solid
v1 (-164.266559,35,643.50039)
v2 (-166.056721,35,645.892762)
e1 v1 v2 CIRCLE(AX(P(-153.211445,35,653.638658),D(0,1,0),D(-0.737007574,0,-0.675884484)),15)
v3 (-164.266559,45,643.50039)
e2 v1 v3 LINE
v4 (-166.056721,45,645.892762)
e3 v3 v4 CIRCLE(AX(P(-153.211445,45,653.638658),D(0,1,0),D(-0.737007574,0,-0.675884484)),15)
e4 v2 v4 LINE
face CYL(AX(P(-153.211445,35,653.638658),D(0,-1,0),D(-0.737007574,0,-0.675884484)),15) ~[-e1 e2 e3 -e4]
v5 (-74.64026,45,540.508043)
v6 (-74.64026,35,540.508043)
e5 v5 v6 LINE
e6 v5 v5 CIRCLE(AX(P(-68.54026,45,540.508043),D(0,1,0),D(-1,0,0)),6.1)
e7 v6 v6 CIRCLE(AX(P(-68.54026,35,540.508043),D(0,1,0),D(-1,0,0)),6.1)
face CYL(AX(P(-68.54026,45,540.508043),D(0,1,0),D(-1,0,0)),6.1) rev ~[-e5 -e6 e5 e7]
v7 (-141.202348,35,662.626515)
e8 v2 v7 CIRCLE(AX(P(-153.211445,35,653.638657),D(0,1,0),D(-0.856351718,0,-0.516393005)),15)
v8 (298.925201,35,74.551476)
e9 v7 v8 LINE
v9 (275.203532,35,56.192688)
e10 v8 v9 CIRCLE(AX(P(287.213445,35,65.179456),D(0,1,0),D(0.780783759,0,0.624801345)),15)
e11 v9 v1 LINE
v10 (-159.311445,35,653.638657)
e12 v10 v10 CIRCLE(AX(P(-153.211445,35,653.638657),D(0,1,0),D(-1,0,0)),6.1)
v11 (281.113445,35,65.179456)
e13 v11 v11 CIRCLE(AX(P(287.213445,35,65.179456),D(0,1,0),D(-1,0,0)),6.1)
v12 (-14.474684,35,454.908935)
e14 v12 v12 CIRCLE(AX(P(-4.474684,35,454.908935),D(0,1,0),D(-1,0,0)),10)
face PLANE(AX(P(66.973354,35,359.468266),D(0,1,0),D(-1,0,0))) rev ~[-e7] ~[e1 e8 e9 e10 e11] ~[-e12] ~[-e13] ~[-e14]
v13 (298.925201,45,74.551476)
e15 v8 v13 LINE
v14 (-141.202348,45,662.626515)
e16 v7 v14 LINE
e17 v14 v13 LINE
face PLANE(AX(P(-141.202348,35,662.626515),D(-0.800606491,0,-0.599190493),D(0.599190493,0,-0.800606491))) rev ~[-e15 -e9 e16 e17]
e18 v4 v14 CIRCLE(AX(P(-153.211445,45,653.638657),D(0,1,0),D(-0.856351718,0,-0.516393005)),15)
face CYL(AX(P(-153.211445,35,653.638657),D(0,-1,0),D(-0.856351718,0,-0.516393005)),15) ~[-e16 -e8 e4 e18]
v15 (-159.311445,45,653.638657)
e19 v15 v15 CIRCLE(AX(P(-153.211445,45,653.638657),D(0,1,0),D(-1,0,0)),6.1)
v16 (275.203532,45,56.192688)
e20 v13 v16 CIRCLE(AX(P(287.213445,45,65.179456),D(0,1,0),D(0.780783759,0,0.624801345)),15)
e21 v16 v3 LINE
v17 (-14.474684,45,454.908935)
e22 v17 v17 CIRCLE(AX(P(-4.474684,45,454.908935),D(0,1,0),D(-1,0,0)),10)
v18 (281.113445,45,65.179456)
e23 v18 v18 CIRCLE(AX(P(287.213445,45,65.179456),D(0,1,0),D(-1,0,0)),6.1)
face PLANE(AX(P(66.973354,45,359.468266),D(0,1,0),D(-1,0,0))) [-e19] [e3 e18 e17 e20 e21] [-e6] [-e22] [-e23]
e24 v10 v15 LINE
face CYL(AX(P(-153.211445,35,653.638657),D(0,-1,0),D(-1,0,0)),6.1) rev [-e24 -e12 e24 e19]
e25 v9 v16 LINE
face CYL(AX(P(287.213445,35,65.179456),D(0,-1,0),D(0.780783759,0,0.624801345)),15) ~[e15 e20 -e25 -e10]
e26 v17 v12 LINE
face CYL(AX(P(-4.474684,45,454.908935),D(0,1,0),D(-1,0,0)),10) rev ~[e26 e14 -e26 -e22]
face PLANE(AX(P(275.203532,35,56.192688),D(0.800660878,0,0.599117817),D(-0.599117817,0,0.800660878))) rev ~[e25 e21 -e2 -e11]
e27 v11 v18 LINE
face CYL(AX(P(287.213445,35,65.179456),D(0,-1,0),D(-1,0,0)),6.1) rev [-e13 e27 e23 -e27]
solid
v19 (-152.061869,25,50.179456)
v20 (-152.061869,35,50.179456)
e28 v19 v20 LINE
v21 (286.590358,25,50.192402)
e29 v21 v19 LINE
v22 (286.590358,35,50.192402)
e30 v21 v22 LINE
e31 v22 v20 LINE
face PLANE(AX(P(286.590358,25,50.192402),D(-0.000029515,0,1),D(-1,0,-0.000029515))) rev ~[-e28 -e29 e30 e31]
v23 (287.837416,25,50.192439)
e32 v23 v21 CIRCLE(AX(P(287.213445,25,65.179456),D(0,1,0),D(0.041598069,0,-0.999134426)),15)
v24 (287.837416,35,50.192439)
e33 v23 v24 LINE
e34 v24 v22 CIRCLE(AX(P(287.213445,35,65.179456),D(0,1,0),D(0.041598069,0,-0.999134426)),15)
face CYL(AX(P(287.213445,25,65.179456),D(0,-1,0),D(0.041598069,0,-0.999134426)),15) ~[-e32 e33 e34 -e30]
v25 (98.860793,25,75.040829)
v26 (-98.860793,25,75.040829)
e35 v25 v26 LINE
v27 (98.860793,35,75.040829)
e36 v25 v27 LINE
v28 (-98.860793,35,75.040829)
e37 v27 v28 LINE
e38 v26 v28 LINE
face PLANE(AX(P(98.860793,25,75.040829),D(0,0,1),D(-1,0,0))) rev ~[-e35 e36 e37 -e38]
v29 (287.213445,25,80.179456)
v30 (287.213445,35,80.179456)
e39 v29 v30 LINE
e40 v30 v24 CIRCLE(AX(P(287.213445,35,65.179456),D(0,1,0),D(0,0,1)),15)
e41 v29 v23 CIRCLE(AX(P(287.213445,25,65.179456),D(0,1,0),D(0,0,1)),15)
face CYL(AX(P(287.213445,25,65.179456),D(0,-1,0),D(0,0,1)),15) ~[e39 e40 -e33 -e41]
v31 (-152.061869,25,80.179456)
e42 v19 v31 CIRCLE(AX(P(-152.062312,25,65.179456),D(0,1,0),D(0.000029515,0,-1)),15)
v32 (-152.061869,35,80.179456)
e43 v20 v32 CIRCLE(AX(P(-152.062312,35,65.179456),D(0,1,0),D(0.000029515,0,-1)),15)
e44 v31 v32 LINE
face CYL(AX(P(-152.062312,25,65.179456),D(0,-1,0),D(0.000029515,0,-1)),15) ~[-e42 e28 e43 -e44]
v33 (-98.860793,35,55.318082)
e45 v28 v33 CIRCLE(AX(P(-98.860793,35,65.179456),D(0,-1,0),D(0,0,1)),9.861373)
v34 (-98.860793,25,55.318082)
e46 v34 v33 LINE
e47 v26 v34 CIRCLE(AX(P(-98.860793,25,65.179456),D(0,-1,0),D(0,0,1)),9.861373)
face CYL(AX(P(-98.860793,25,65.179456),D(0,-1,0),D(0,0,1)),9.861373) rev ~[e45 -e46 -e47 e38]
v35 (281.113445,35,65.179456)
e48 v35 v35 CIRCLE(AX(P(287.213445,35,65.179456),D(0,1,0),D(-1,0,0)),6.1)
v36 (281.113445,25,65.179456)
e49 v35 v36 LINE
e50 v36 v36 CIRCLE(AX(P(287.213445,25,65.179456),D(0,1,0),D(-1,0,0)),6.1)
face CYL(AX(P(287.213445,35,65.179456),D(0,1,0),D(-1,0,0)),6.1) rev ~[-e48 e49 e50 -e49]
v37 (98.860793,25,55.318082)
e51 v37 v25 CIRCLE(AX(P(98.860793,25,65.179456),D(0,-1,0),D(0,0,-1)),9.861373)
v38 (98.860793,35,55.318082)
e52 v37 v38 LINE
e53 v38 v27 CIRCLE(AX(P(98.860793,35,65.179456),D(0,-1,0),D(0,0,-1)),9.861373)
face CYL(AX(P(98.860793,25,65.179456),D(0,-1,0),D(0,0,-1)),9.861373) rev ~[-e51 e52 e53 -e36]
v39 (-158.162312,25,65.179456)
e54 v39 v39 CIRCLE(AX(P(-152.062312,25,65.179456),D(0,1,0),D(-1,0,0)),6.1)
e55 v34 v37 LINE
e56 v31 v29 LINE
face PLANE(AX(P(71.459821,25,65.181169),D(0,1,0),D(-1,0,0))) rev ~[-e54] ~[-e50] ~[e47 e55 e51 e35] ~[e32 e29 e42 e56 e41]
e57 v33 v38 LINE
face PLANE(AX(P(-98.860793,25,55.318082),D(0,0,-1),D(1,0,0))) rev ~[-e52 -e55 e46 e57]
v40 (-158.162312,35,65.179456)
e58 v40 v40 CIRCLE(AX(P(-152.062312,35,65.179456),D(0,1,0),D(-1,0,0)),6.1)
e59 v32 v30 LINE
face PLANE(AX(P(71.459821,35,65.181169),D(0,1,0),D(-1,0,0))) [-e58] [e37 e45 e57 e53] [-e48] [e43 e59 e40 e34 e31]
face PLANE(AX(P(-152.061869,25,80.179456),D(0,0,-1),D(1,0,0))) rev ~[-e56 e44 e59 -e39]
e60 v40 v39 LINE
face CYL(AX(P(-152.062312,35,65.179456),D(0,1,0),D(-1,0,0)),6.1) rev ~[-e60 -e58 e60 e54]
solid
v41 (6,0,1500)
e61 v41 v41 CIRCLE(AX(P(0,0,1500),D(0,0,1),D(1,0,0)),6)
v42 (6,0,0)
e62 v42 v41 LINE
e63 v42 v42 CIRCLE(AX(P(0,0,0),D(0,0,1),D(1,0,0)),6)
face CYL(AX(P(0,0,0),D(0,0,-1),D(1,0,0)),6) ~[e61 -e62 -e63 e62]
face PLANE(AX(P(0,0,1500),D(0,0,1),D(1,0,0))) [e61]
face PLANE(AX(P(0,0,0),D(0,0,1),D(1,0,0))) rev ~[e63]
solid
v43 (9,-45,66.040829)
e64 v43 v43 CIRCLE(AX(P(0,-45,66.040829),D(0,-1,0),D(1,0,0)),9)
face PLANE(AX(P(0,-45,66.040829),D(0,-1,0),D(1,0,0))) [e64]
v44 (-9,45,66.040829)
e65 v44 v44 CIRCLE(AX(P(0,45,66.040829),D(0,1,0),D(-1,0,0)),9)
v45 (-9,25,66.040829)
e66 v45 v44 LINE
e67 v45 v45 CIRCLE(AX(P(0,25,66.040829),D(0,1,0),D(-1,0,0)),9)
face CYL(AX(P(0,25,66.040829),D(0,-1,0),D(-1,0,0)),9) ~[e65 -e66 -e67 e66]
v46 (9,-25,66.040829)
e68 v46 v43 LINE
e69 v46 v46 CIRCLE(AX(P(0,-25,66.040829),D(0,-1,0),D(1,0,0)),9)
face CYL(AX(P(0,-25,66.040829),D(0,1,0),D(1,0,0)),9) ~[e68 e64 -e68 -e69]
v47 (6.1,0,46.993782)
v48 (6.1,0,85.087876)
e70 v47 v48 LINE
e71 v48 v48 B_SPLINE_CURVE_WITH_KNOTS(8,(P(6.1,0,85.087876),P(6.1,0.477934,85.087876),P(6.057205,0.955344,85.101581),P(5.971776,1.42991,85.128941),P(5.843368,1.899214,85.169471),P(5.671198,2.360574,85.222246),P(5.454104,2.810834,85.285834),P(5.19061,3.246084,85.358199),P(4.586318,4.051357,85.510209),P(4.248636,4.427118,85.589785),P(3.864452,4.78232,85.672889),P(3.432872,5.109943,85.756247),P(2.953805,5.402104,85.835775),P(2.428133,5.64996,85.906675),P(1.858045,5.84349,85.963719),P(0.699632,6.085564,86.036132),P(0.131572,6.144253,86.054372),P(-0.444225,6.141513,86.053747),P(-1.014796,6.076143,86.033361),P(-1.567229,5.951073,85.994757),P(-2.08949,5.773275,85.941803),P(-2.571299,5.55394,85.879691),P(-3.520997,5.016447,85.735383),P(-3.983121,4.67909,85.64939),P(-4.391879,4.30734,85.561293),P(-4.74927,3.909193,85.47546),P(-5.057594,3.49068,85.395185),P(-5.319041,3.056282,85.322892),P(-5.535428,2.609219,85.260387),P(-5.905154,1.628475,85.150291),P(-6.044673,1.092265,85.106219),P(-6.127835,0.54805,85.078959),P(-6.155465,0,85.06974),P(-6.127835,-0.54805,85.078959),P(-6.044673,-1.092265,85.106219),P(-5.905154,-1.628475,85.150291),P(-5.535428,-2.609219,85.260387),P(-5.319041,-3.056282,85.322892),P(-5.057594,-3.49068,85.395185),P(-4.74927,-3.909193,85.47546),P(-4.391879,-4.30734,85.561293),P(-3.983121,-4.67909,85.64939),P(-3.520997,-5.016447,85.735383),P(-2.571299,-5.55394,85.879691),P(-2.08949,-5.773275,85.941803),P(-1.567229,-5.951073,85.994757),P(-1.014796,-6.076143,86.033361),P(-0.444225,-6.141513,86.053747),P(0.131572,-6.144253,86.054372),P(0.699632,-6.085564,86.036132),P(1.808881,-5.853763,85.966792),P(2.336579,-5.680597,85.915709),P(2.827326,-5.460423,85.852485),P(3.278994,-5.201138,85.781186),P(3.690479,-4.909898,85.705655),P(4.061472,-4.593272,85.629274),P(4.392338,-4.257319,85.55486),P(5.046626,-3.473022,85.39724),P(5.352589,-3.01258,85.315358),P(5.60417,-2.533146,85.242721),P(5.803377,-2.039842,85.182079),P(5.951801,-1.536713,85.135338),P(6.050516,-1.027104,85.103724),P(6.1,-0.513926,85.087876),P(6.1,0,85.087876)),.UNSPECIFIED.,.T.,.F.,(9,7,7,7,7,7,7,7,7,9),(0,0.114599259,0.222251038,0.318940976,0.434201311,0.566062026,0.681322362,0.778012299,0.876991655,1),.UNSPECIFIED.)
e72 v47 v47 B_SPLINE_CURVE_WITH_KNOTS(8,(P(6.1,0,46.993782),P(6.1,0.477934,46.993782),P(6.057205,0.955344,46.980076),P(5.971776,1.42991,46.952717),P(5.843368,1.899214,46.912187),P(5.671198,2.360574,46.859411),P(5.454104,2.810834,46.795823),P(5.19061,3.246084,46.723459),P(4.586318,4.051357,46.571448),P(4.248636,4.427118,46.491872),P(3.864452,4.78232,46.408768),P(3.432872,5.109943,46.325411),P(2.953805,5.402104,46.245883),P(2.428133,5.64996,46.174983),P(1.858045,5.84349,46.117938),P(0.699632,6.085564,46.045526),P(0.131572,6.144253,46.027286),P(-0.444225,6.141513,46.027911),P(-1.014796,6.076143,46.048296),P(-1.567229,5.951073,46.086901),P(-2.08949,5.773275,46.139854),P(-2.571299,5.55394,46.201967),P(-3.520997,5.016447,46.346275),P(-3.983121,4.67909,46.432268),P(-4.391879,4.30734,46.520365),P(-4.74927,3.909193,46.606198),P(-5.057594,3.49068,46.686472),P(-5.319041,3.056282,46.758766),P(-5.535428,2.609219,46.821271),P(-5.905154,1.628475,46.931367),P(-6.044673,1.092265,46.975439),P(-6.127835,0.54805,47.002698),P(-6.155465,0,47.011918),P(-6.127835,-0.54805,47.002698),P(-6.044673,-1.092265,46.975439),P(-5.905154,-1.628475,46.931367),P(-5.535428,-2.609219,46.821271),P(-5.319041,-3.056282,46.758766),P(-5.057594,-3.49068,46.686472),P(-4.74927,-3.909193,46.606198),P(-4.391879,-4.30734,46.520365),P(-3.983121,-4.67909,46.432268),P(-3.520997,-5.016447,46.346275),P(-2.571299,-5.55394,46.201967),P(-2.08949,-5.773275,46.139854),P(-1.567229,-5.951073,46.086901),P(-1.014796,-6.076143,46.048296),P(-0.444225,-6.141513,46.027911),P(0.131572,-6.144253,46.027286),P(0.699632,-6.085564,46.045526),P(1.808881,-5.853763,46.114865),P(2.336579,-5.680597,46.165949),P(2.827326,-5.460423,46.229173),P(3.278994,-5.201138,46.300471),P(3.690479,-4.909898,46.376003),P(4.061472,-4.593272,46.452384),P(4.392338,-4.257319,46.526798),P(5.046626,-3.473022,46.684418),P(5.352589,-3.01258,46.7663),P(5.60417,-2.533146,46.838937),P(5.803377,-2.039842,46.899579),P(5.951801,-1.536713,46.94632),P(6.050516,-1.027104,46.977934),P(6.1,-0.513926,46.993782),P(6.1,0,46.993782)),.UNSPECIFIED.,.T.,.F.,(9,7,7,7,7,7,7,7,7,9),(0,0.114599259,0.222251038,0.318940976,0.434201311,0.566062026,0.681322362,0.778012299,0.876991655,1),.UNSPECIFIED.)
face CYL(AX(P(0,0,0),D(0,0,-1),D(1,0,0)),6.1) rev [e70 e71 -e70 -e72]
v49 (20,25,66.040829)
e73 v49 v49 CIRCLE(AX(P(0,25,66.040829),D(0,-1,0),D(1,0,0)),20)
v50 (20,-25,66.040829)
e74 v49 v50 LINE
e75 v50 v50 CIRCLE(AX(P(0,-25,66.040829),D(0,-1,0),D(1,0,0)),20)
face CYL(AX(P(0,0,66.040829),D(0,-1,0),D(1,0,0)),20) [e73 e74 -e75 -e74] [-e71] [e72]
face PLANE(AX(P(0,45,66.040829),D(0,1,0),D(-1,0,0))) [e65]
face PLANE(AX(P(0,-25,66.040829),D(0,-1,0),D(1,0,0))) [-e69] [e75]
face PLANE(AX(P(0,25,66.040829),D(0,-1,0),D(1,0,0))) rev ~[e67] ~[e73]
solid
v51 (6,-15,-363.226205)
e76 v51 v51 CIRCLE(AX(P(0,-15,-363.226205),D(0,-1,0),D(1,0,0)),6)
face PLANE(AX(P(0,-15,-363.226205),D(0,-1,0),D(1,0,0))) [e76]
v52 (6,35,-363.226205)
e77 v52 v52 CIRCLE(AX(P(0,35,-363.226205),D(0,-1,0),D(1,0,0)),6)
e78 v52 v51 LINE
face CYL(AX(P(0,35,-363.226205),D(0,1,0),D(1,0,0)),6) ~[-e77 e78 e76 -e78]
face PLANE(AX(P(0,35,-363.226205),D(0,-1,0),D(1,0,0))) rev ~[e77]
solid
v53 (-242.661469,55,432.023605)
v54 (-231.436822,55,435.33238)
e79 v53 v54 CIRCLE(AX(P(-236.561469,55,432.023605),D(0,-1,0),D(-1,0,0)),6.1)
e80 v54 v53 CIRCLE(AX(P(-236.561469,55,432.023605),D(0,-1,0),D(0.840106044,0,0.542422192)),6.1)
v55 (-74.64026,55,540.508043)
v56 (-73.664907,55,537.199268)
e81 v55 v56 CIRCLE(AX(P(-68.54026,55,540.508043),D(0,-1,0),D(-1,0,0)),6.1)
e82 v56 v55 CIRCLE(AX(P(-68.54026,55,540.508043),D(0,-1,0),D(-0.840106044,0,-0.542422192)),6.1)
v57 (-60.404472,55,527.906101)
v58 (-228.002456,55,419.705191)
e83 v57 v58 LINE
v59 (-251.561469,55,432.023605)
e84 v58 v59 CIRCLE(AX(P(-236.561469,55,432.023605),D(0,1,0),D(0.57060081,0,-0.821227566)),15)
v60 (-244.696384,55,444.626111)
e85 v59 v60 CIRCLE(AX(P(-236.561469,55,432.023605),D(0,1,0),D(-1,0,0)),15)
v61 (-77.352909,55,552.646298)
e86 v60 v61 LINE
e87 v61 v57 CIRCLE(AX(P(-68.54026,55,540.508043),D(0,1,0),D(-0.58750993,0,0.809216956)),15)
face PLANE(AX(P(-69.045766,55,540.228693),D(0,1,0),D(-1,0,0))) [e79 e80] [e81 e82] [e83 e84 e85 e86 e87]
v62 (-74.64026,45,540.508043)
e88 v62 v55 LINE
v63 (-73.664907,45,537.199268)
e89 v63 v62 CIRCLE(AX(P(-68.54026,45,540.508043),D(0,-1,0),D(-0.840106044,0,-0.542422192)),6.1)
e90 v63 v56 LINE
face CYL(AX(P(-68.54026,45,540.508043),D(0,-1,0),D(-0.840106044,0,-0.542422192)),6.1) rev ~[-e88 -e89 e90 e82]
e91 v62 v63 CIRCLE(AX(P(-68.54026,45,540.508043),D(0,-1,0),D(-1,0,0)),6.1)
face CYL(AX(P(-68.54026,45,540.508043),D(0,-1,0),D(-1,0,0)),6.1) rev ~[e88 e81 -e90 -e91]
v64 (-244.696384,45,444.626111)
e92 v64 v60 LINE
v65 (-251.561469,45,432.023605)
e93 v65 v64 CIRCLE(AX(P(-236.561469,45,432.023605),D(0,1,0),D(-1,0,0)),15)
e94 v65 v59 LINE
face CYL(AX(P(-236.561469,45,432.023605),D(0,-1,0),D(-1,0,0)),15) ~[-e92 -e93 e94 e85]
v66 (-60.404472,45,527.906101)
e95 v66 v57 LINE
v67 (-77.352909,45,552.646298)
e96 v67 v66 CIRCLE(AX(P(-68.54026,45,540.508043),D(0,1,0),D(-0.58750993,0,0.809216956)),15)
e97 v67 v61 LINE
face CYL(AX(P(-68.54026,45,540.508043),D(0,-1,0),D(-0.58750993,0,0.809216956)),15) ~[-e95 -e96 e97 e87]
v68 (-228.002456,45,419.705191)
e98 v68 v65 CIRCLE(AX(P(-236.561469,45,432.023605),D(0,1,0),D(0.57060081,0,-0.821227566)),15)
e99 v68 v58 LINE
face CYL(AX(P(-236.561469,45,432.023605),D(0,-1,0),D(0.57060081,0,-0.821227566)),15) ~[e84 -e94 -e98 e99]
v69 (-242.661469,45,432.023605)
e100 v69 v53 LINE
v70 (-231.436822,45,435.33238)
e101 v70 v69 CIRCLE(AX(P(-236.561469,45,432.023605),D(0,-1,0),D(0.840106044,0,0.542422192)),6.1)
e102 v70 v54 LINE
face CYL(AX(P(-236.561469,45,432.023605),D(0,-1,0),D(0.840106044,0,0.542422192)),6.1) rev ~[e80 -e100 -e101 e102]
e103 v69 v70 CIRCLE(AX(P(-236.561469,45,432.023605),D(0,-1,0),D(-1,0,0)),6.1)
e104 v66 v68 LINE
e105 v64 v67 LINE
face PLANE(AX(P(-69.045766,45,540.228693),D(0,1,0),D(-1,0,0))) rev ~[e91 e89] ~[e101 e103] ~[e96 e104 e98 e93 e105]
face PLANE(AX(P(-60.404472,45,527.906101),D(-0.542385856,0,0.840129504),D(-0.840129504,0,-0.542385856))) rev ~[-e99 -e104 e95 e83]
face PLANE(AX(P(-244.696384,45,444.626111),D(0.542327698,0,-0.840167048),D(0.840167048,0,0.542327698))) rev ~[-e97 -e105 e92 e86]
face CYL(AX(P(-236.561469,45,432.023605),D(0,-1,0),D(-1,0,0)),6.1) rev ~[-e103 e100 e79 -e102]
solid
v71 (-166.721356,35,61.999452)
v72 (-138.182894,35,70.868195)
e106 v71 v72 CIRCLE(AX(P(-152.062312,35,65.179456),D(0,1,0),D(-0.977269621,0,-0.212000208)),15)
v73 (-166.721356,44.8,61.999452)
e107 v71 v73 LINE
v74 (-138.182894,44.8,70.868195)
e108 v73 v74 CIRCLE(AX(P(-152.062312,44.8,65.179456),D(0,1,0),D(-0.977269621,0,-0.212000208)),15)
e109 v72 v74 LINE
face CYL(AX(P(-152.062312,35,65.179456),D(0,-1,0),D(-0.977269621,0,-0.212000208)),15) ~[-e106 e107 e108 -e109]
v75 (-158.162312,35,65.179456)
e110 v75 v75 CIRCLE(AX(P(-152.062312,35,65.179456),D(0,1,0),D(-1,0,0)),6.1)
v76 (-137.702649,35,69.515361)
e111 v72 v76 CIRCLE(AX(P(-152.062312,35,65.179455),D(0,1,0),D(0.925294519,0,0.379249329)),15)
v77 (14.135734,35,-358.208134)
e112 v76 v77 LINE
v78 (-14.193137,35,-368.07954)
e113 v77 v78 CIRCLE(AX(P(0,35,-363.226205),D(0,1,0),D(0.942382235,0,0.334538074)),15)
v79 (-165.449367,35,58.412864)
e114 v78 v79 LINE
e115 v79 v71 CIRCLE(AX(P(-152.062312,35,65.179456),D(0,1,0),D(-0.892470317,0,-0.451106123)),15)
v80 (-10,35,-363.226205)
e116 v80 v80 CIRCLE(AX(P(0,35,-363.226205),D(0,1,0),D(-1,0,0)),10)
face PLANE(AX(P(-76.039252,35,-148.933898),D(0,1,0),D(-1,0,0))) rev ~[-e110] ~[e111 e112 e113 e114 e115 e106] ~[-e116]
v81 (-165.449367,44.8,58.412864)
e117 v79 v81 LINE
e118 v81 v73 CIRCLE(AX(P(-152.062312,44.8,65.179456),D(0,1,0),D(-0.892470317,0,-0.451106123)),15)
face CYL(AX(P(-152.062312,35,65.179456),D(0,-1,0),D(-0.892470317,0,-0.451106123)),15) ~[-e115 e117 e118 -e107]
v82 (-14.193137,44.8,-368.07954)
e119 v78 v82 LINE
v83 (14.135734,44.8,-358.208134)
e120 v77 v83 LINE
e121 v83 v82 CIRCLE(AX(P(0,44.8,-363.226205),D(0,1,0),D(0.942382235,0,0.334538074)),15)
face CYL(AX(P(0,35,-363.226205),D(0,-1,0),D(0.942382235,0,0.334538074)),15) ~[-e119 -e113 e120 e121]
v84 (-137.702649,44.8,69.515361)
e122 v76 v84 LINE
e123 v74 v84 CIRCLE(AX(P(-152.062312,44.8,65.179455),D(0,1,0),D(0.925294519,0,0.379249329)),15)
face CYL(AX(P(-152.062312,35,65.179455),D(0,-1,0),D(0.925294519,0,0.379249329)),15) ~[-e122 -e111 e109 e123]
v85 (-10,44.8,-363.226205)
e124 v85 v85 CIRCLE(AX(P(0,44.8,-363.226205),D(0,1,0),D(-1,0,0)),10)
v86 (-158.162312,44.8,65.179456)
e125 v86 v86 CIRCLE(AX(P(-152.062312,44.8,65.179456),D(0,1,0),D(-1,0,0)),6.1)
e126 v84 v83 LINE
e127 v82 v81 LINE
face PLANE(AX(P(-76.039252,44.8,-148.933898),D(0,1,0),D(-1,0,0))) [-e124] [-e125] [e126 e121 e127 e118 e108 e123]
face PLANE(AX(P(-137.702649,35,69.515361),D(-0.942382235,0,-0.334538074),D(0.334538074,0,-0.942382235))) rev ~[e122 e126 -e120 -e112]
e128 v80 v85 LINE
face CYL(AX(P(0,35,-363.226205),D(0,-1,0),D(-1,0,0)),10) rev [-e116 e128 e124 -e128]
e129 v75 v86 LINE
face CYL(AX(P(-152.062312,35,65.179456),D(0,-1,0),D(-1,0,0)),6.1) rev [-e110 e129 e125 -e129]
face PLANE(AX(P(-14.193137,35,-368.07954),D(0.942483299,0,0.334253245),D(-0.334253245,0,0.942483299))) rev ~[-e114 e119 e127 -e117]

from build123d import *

# Parameters (mm, degrees)
F0_R          = 6
F1_DEPTH      = 1500
F2_R          = 20
F3_DEPTH      = 25
F3_DEPTH_BACK = 25
F4_R          = 9
F5_DEPTH      = 20
F6_R          = 9
F7_DEPTH      = 20
F8_R          = 6.1
F9_DEPTH      = 100
F11_DEPTH     = 10
F12_R         = 6.1
F13_DEPTH     = 25
F14_R         = 6.1
F15_DEPTH     = 25
F16_R         = 6.1
F17_DEPTH     = 10
F18_R         = 10
F18_R_2       = 6.1
F19_DEPTH     = 9.8
F20_R         = 10
F21_DEPTH     = 25
F22_R         = 6.1
F23_DEPTH     = 25
F25_DEPTH     = 10
F26_R         = 6
F27_DEPTH     = 50


with BuildPart() as f1:
    # F0 (on Top) → F1 (new body)
    with BuildSketch(Plane.XY):
        Circle(F0_R)
    extrude(amount=F1_DEPTH)


with BuildPart() as f3:
    # F2 (on Front) → F3 (new body, two sides)
    with BuildSketch(Plane.XZ) as f3_sk:
        with Locations((0, 66.0408288468)):
            Circle(F2_R)
    extrude(amount=F3_DEPTH)
    extrude(f3_sk.sketch, amount=-F3_DEPTH_BACK)

    # F4 (on face) → F5 (join)
    with BuildSketch(Plane.XZ.offset(25)):
        with Locations((0, 66.0408288468)):
            Circle(F4_R)
    extrude(amount=F5_DEPTH)

    # F6 (on face) → F7 (join)
    with BuildSketch(Plane(origin=(0, 25, 0), x_dir=(-1, 0, 0), z_dir=(0, 1, 0))):
        with Locations((0, 66.0408288468)):
            Circle(F6_R)
    extrude(amount=F7_DEPTH)

    # F8 (on Top) → F9 (cut)
    with BuildSketch(Plane.XY):
        Circle(F8_R)
    extrude(amount=F9_DEPTH, mode=Mode.SUBTRACT)


with BuildPart() as f11:
    # F10 (on face) → F11 (new body)
    with BuildSketch(Plane(origin=(0, 25, 0), x_dir=(-1, 0, 0), z_dir=(0, 1, 0))):
        with BuildLine():
            Line((152.0618690442, 80.1794555013), (-287.2134447098, 80.1794555079))
            ThreePointArc((-287.2134447098, 80.1794555079), (-302.210198455, 65.4915085567), (-287.8374157402, 50.1924391219))
            Line((-287.8374157402, 50.1924391219), (-286.5903583626, 50.192402315))
            Line((-286.5903583626, 50.192402315), (152.0618690442, 50.1794555144))
            Line((152.0618690442, 50.1794555144), (152.0618690442, 80.1794555013))
        make_face()
        with BuildLine():
            ThreePointArc((-98.8607928157, 55.3180821689), (-108.7221661547, 65.1794555079), (-98.8607928157, 75.0408288468))
            Line((-98.8607928157, 75.0408288468), (98.8607928157, 75.0408288468))
            ThreePointArc((98.8607928157, 75.0408288468), (108.7221661547, 65.1794555079), (98.8607928157, 55.3180821689))
            Line((98.8607928157, 55.3180821689), (-98.8607928157, 55.3180821689))
        make_face(mode=Mode.SUBTRACT)
        with BuildLine():
            Line((-286.5903583626, 50.192402315), (-287.8374157402, 50.1924391219))
            ThreePointArc((-287.8374157402, 50.1924391219), (-287.2138874341, 50.1794555144), (-286.5903583626, 50.192402315))
        make_face()
        with BuildLine():
            ThreePointArc((152.0618690442, 50.1794555144), (167.0623117685, 65.1794555079), (152.0618690442, 80.1794555013))
            Line((152.0618690442, 80.1794555013), (152.0618690442, 50.1794555144))
        make_face()
    extrude(amount=F11_DEPTH)

    # F12 (on face) → F13 (cut)
    with BuildSketch(Plane(origin=(0, 35, 0), x_dir=(-1, 0, 0), z_dir=(0, 1, 0))):
        with Locations((-287.2134447098, 65.1794555079)):
            Circle(F12_R)
    extrude(amount=-F13_DEPTH, mode=Mode.SUBTRACT)

    # F14 (on face) → F15 (cut)
    with BuildSketch(Plane(origin=(0, 35, 0), x_dir=(-1, 0, 0), z_dir=(0, 1, 0))):
        with Locations((152.0623117685, 65.1794555079)):
            Circle(F14_R)
    extrude(amount=-F15_DEPTH, mode=Mode.SUBTRACT)


with BuildPart() as f17:
    # F16 (on face) → F17 (new body)
    with BuildSketch(Plane(origin=(0, 35, 0), x_dir=(-1, 0, 0), z_dir=(0, 1, 0))):
        with BuildLine():
            Line((141.2023478455, 662.6265148895), (-298.9252010995, 74.5514756885))
            ThreePointArc((-298.9252010995, 74.5514756885), (-296.3940489054, 53.3170566525), (-275.2035315421, 56.1926882524))
            Line((-275.2035315421, 56.1926882524), (164.2665588229, 643.5003902394))
            Line((164.2665588229, 643.5003902394), (166.0567209766, 645.8927624252))
            ThreePointArc((166.0567209766, 645.8927624252), (161.588760798, 666.0813494708), (141.2023478455, 662.6265148895))
        make_face()
        with Locations((-287.2134447098, 65.1794555079)):
            Circle(F16_R, mode=Mode.SUBTRACT)
        with Locations((153.2114452098, 653.6386574978)):
            Circle(F16_R, mode=Mode.SUBTRACT)
        with BuildLine():
            Line((166.0567209766, 645.8927624252), (164.2665588229, 643.5003902394))
            ThreePointArc((164.2665588229, 643.5003902394), (165.2213583775, 644.6518902423), (166.0567209766, 645.8927624252))
        make_face()
    extrude(amount=F17_DEPTH)

    # F20 (on face) → F21 (cut)
    with BuildSketch(Plane(origin=(0, 45, 0), x_dir=(-1, 0, 0), z_dir=(0, 1, 0))):
        with Locations((4.4746835584, 454.9089351973)):
            Circle(F20_R)
    extrude(amount=-F21_DEPTH, mode=Mode.SUBTRACT)

    # F22 (on face) → F23 (cut)
    with BuildSketch(Plane(origin=(0, 45, 0), x_dir=(-1, 0, 0), z_dir=(0, 1, 0))):
        with Locations((68.5402597264, 540.5080434442)):
            Circle(F22_R)
    extrude(amount=-F23_DEPTH, mode=Mode.SUBTRACT)


with BuildPart() as f19:
    # F18 (on face) → F19 (new body)
    with BuildSketch(Plane(origin=(0, 35, 0), x_dir=(-1, 0, 0), z_dir=(0, 1, 0))):
        with BuildLine():
            Line((137.7026486797, 69.5153609467), (-14.1357335289, -358.208134007))
            ThreePointArc((-14.1357335289, -358.208134007), (-4.9357863724, -377.3908799351), (14.1931371418, -368.0795398482))
            Line((14.1931371418, -368.0795398482), (165.4493665169, 58.4128636653))
            Line((165.4493665169, 58.4128636653), (166.7213560809, 61.9994523872))
            ThreePointArc((166.7213560809, 61.9994523872), (156.513784022, 79.5037144687), (138.1828939866, 70.8681954417))
            Line((138.1828939866, 70.8681954417), (137.7026486797, 69.5153609467))
        make_face()
        with Locations((0, -363.2262051106)):
            Circle(F18_R, mode=Mode.SUBTRACT)
        with Locations((152.0623117685, 65.1794555079)):
            Circle(F18_R_2, mode=Mode.SUBTRACT)
        with BuildLine():
            ThreePointArc((138.1828939866, 70.8681954417), (137.9265782397, 70.1975266114), (137.7026486797, 69.5153609467))
            Line((137.7026486797, 69.5153609467), (138.1828939866, 70.8681954417))
        make_face()
        with BuildLine():
            Line((166.7213560809, 61.9994523872), (165.4493665169, 58.4128636653))
            ThreePointArc((165.4493665169, 58.4128636653), (166.1995612463, 60.1656568279), (166.7213560809, 61.9994523872))
        make_face()
    extrude(amount=F19_DEPTH)


with BuildPart() as f25:
    # F24 (on face) → F25 (new body)
    with BuildSketch(Plane(origin=(0, 45, 0), x_dir=(-1, 0, 0), z_dir=(0, 1, 0))):
        with BuildLine():
            ThreePointArc((81.1418503879, 532.37171056), (82.9281688852, 536.2668089495), (83.5402597264, 540.5080434442))
            ThreePointArc((83.5402597264, 540.5080434442), (81.9041987858, 547.320174742), (77.3529086839, 552.6462977813))
            ThreePointArc((77.3529086839, 552.6462977813), (56.1655326255, 548.9854327343), (60.4044718845, 527.9061008879))
            ThreePointArc((60.4044718845, 527.9061008879), (71.6979908964, 525.8441853619), (81.1418503879, 532.37171056))
        make_face()
        with BuildLine():
            ThreePointArc((74.6402597264, 540.5080434442), (74.3913427843, 538.7832747497), (73.6649065954, 537.1992680713))
            ThreePointArc((73.6649065954, 537.1992680713), (62.6891766685, 542.2328121387), (74.6402597264, 540.5080434442))
        make_face(mode=Mode.SUBTRACT)
        with BuildLine():
            ThreePointArc((77.3529086839, 552.6462977813), (81.9041987858, 547.320174742), (83.5402597264, 540.5080434442))
            ThreePointArc((83.5402597264, 540.5080434442), (82.9281688852, 536.2668089495), (81.1418503879, 532.37171056))
            Line((81.1418503879, 532.37171056), (223.9598778841, 440.1599378729))
            ThreePointArc((223.9598778841, 440.1599378729), (233.4032298314, 446.6873537668), (244.69638401, 444.6261107073))
            Line((244.69638401, 444.6261107073), (77.3529086839, 552.6462977813))
        make_face()
        with BuildLine():
            Line((223.9598778841, 440.1599378729), (81.1418503879, 532.37171056))
            ThreePointArc((81.1418503879, 532.37171056), (71.6979908964, 525.8441853619), (60.4044718845, 527.9061008879))
            Line((60.4044718845, 527.9061008879), (228.0024563935, 419.7051914959))
            ThreePointArc((228.0024563935, 419.7051914959), (221.8461044591, 429.1153306197), (223.9598778841, 440.1599378729))
        make_face()
        with BuildLine():
            ThreePointArc((251.5614685455, 432.0236049888), (249.7338588367, 439.1991282461), (244.69638401, 444.6261107073))
            ThreePointArc((244.69638401, 444.6261107073), (233.4032298314, 446.6873537668), (223.9598778841, 440.1599378729))
            ThreePointArc((223.9598778841, 440.1599378729), (221.8461044591, 429.1153306197), (228.0024563935, 419.7051914959))
            ThreePointArc((228.0024563935, 419.7051914959), (243.5118216919, 418.7310284462), (251.5614685455, 432.0236049888))
        make_face()
        with BuildLine():
            ThreePointArc((242.6614685455, 432.0236049888), (234.836699851, 426.1725219309), (231.4368216765, 435.3323803617))
            ThreePointArc((231.4368216765, 435.3323803617), (238.28623724, 437.8746880467), (242.6614685455, 432.0236049888))
        make_face(mode=Mode.SUBTRACT)
    extrude(amount=F25_DEPTH)


with BuildPart() as f27:
    # F26 (on face) → F27 (new body)
    with BuildSketch(Plane.XZ.offset(-35)):
        with Locations((0, -363.2262051106)):
            Circle(F26_R)
    extrude(amount=F27_DEPTH)


solid = Compound([f1.part, f3.part, f11.part, f17.part, f19.part, f25.part, f27.part])
